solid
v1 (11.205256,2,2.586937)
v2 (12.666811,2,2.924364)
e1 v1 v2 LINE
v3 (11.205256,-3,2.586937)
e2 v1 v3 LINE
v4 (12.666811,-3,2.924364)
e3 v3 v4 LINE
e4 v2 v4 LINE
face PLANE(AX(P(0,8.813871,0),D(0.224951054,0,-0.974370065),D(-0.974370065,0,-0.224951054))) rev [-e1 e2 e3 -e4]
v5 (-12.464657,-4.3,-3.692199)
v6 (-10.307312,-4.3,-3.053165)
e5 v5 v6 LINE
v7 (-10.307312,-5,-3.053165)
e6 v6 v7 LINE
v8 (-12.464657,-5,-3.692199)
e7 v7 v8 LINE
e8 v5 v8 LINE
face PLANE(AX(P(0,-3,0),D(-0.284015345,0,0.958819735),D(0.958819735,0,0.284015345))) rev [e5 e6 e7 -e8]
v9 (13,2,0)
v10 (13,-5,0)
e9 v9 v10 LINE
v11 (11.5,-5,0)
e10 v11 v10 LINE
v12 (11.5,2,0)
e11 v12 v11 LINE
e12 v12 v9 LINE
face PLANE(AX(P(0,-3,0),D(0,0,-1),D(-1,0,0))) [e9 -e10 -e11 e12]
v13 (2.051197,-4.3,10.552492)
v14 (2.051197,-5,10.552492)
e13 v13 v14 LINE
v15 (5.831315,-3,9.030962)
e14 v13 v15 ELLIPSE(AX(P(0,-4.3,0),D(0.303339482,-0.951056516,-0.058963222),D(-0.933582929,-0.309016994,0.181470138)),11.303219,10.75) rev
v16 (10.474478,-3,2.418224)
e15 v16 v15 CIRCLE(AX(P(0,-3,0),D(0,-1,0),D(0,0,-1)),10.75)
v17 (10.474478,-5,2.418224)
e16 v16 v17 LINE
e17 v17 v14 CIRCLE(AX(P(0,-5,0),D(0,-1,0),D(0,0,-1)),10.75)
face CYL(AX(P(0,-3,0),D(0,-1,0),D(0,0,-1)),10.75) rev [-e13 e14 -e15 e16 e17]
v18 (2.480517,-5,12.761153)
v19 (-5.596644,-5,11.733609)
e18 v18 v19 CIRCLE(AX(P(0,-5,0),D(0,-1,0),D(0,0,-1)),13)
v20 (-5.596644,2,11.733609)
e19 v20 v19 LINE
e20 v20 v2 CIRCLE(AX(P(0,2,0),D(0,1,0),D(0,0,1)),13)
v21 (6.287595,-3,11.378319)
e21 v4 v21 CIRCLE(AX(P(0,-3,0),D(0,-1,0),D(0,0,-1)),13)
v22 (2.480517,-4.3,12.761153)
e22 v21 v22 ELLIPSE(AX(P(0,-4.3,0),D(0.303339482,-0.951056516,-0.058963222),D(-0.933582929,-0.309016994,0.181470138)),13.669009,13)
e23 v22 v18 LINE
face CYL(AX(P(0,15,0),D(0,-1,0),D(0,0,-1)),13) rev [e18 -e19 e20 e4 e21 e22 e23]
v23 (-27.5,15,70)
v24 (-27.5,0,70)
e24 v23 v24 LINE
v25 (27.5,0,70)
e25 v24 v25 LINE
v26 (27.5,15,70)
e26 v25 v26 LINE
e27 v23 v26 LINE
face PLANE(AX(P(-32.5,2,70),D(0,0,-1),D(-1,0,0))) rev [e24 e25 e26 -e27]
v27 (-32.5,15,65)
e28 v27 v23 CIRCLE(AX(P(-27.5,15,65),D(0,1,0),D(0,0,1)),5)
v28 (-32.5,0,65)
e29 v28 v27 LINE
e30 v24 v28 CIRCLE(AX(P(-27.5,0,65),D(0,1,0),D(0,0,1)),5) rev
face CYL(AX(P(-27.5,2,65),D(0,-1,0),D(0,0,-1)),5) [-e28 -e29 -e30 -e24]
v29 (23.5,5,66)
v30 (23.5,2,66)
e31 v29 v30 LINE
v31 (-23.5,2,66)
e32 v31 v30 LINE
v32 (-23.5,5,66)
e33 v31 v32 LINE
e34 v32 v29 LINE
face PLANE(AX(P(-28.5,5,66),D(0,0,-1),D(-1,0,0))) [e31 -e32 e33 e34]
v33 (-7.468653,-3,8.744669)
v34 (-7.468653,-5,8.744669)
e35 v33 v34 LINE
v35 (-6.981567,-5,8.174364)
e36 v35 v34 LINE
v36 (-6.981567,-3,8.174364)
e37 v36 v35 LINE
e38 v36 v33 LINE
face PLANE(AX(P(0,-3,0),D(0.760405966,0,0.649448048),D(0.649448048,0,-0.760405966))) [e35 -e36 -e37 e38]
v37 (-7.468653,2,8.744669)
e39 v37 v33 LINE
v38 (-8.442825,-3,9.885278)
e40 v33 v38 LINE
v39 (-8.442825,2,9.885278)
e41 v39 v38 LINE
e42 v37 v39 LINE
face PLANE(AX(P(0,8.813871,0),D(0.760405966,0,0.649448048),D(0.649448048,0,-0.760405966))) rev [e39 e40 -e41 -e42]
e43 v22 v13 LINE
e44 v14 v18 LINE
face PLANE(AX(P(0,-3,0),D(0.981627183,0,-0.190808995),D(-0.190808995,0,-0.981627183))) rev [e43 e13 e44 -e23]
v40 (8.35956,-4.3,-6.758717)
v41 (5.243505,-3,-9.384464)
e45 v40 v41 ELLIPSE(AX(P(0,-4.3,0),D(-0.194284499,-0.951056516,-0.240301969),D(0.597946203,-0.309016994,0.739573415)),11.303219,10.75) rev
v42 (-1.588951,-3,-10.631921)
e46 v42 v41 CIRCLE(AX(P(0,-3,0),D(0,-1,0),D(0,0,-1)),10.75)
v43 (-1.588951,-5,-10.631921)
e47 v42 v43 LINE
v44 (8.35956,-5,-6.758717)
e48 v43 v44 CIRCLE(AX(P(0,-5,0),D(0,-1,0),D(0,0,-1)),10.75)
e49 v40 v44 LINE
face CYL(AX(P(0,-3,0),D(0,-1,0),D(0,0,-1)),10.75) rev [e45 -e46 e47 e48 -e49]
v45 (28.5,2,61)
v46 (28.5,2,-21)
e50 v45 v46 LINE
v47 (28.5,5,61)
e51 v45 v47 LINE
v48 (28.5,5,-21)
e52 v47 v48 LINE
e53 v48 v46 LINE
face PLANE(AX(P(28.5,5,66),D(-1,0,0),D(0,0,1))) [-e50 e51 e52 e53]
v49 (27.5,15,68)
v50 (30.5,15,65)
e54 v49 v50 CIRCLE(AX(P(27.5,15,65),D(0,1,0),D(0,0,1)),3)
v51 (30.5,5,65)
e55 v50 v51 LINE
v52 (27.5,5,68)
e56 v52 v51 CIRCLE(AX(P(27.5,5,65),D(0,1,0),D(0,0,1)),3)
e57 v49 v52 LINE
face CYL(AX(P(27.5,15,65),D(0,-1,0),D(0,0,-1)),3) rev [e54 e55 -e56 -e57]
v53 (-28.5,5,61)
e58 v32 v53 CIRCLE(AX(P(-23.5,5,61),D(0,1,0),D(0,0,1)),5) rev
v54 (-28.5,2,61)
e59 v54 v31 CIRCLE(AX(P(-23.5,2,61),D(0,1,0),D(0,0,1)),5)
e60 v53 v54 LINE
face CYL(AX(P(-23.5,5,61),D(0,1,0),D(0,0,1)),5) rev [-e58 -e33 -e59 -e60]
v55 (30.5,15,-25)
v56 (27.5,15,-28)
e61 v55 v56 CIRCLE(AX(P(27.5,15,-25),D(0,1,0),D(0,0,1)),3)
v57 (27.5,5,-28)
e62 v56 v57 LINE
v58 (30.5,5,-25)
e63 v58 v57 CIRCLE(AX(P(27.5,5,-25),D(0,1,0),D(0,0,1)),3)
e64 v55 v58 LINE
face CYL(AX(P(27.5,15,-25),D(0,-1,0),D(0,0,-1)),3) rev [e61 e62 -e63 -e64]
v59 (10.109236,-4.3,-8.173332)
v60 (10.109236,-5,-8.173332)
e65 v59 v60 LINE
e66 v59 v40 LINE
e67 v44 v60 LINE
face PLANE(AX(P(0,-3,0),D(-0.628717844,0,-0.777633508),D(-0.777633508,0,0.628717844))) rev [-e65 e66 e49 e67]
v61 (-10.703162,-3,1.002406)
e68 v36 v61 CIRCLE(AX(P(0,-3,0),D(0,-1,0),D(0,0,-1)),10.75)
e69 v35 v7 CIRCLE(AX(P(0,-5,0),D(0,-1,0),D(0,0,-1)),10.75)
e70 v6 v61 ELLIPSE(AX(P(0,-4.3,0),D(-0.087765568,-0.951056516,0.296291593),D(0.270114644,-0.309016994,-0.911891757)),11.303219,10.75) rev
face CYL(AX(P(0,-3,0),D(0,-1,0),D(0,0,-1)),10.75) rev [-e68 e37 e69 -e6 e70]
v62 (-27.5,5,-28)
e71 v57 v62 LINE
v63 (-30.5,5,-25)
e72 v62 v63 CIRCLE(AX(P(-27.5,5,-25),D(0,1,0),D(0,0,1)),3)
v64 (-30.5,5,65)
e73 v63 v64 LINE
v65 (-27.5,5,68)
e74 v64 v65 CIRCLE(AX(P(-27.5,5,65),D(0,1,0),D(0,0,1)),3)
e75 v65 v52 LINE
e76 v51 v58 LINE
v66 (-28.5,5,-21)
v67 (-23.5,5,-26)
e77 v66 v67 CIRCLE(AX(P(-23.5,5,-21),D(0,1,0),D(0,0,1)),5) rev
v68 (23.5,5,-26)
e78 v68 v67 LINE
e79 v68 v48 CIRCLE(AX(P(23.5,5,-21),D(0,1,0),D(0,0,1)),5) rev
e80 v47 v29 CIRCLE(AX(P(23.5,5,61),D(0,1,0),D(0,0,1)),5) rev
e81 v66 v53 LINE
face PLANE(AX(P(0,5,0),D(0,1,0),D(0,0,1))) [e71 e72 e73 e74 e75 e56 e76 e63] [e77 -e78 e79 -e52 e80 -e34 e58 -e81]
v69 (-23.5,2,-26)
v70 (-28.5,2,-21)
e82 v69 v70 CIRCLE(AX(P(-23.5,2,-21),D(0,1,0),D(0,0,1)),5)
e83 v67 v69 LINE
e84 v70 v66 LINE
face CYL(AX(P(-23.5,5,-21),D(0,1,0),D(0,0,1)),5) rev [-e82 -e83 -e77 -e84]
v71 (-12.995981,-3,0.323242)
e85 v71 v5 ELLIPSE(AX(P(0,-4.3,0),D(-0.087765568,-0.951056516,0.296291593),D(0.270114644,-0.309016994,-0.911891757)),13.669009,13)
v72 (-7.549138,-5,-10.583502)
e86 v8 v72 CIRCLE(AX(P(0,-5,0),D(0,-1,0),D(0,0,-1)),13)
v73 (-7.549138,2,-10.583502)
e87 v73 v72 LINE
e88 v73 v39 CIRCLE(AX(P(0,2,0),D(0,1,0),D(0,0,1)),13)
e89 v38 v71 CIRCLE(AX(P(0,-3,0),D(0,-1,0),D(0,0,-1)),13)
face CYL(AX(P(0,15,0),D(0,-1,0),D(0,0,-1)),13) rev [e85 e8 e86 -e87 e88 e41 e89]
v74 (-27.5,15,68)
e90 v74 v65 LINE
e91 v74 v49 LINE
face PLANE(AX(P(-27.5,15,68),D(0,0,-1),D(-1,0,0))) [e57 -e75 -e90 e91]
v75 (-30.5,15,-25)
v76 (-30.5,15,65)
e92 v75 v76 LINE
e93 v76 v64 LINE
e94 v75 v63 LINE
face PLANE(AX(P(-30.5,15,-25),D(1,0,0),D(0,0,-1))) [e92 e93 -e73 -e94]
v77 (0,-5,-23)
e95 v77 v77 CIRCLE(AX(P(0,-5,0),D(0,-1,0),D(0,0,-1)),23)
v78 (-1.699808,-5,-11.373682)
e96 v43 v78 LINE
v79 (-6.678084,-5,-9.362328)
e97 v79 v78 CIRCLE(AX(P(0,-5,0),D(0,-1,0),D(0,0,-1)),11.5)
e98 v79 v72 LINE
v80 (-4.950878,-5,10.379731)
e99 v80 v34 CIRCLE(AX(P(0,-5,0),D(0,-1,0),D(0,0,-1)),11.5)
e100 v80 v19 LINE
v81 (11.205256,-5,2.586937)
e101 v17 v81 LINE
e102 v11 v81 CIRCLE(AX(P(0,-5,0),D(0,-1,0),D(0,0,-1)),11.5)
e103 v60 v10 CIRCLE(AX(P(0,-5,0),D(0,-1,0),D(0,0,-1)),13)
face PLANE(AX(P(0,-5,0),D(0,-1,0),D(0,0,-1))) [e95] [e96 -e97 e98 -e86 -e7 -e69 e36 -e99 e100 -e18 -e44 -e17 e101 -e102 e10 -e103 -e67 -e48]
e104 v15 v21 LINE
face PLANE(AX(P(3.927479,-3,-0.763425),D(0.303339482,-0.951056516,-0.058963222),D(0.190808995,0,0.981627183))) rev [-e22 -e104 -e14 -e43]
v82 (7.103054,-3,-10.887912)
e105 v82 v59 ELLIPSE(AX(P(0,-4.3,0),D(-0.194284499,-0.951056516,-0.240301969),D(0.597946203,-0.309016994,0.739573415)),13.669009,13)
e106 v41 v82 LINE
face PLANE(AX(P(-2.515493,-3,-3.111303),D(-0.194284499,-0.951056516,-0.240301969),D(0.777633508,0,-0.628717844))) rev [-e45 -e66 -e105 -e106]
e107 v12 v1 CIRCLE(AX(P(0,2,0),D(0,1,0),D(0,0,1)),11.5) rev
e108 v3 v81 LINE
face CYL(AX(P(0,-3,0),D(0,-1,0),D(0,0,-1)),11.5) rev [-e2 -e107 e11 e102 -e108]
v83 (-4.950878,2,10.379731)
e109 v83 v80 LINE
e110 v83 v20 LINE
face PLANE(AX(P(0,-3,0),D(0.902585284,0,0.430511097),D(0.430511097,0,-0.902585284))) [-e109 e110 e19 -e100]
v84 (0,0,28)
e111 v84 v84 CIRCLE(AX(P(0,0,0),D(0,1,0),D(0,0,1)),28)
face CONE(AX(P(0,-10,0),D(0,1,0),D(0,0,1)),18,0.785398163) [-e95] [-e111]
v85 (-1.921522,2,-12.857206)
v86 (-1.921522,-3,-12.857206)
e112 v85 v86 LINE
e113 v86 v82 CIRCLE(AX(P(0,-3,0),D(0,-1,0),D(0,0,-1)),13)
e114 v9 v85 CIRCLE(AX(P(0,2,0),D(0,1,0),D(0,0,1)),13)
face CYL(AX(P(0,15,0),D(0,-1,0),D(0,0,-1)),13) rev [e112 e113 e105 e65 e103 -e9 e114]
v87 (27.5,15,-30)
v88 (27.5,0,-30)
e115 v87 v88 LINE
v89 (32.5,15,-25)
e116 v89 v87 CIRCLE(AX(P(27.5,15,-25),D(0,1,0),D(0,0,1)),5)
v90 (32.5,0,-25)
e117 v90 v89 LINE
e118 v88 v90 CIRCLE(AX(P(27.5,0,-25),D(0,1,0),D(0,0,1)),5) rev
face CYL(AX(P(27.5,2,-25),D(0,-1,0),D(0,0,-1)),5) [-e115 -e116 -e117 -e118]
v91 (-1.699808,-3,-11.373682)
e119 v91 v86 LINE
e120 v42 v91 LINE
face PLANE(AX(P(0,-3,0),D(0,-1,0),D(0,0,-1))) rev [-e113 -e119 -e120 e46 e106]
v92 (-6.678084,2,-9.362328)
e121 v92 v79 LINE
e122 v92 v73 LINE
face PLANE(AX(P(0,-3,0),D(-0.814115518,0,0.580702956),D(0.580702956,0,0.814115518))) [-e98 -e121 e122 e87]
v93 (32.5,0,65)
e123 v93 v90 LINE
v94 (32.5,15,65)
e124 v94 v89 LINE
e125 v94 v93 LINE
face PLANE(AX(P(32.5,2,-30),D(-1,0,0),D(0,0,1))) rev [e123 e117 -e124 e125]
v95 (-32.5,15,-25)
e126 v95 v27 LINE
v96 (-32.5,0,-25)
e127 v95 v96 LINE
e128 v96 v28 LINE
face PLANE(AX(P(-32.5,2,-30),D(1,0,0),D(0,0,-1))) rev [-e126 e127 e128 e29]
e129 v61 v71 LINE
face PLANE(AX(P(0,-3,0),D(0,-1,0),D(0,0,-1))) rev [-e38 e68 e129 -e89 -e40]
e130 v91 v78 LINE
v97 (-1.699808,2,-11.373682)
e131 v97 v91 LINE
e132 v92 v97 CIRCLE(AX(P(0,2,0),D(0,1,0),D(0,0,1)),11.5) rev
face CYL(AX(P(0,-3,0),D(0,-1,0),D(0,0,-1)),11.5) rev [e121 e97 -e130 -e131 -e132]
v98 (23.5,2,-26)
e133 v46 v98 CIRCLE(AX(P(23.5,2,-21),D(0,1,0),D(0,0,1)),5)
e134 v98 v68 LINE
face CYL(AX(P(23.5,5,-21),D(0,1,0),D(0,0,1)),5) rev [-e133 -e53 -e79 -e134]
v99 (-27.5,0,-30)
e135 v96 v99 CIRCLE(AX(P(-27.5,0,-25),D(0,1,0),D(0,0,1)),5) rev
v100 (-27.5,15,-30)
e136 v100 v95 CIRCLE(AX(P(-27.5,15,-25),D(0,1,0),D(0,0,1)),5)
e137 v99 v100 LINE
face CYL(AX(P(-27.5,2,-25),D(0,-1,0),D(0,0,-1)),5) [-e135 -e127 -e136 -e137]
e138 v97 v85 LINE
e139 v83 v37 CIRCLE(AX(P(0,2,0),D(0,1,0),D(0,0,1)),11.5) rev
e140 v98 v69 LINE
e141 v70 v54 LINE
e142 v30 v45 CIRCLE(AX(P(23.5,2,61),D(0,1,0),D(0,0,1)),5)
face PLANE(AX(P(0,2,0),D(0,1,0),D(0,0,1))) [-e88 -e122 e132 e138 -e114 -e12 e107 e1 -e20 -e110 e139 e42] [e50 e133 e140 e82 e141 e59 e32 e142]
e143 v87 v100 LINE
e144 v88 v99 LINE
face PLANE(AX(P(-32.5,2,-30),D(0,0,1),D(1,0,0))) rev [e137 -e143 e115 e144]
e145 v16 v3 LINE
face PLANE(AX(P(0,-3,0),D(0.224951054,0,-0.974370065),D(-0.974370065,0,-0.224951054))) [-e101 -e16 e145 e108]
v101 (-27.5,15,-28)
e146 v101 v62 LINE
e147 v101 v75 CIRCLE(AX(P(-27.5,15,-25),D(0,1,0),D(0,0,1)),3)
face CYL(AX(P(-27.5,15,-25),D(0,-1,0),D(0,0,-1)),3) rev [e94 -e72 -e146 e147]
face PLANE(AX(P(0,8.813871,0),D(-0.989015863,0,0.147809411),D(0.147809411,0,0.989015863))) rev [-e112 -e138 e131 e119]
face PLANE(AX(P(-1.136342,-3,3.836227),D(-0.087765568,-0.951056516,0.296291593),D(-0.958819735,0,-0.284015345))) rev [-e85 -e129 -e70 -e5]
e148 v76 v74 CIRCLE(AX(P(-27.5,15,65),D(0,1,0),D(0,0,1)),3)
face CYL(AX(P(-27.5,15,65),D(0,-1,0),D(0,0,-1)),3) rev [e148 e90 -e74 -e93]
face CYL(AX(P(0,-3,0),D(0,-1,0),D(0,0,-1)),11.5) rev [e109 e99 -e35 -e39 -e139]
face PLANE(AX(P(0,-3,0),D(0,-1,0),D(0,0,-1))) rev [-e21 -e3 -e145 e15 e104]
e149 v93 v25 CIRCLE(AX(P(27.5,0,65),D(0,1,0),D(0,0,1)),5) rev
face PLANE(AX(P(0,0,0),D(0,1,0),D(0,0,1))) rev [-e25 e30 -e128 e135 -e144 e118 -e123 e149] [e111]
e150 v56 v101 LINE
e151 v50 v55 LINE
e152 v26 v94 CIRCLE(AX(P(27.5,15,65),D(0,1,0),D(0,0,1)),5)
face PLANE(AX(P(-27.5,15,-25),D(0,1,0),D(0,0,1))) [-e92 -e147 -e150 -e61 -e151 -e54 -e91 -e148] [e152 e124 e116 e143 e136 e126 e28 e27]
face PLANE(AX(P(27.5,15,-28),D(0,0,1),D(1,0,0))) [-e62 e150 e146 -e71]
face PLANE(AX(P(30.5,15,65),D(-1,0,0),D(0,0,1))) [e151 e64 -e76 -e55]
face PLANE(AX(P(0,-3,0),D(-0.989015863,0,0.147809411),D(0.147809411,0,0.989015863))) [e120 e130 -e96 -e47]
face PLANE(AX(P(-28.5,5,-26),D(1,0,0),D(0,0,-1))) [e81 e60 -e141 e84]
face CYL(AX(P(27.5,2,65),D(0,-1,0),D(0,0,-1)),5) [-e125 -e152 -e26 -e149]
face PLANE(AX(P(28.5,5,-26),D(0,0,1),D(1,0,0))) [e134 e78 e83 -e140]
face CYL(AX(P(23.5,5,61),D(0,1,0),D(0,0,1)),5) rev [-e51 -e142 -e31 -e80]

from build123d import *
from OCP.BRepFilletAPI import BRepFilletAPI_MakeChamfer

# Parameters (mm, degrees)
SKETCH1_W           = 65
SKETCH1_H           = 100
BOSS_EXTRUDE1_DEPTH = 2
SKETCH2_W           = 65
SKETCH2_H           = 100
SKETCH2_W_2         = 57
SKETCH2_H_2         = 92
BOSS_EXTRUDE2_DEPTH = 3
FILLET1_R           = 5
BOSS_EXTRUDE3_DEPTH = 10
SKETCH6_R           = 18
BOSS_EXTRUDE4_DEPTH = 5
CHAMFER1_SIZE       = 10
SKETCH7_R           = 13
CUT_EXTRUDE1_DEPTH  = 80.726093596
BOSS_EXTRUDE6_DEPTH = 2
BOSS_EXTRUDE7_DEPTH = 7
CHAMFER2_SIZE       = 1.3
CHAMFER2_SIZE2      = 4.000988598


with BuildPart() as part:
    # Sketch1 → Boss-Extrude1 (new body)
    with BuildSketch(Plane(origin=(0, 0, 0), x_dir=(1, 0, 0), z_dir=(0, 1, 0))):
        with Locations((0, -20)):
            Rectangle(SKETCH1_W, SKETCH1_H)
    extrude(amount=BOSS_EXTRUDE1_DEPTH)

    # Sketch2 → Boss-Extrude2 (add)
    with BuildSketch(Plane(origin=(0, 2, 0), x_dir=(1, 0, 0), z_dir=(0, 1, 0))):
        with Locations((0, -20)):
            Rectangle(SKETCH2_W, SKETCH2_H)
        with Locations((0, -20)):
            Rectangle(SKETCH2_W_2, SKETCH2_H_2, mode=Mode.SUBTRACT)
    extrude(amount=BOSS_EXTRUDE2_DEPTH)

    # Fillet1
    fillet1_edges = [part.edges().sort_by_distance(p)[0] for p in [
        (-28.5, 3.5, 66),
        (28.5, 3.5, 66),
        (28.5, 3.5, -26),
        (-28.5, 3.5, -26),
        (-32.5, 2.5, -30),
        (32.5, 2.5, -30),
        (32.5, 2.5, 70),
        (-32.5, 2.5, 70),
    ]]
    fillet(fillet1_edges, radius=FILLET1_R)

    # Sketch4 → Boss-Extrude3 (add)
    with BuildSketch(Plane(origin=(0, 5, 0), x_dir=(1, 0, 0), z_dir=(0, 1, 0))):
        with BuildLine():
            Line((-32.5, 25), (-32.5, -65))
            ThreePointArc((-32.5, -65), (-31.035533906, -68.535533906), (-27.5, -70))
            Line((-27.5, -70), (27.5, -70))
            ThreePointArc((27.5, -70), (31.035533906, -68.535533906), (32.5, -65))
            Line((32.5, -65), (32.5, 25))
            ThreePointArc((32.5, 25), (31.035533906, 28.535533906), (27.5, 30))
            Line((27.5, 30), (-27.5, 30))
            ThreePointArc((-27.5, 30), (-31.035533906, 28.535533906), (-32.5, 25))
        make_face()
        with BuildLine():
            Line((-30.5, 25), (-30.5, -65))
            ThreePointArc((-30.5, -65), (-29.621320344, -67.121320344), (-27.5, -68))
            Line((-27.5, -68), (27.5, -68))
            ThreePointArc((27.5, -68), (29.621320344, -67.121320344), (30.5, -65))
            Line((30.5, -65), (30.5, 25))
            ThreePointArc((30.5, 25), (29.621320344, 27.121320344), (27.5, 28))
            Line((27.5, 28), (-27.5, 28))
            ThreePointArc((-27.5, 28), (-29.621320344, 27.121320344), (-30.5, 25))
        make_face(mode=Mode.SUBTRACT)
    extrude(amount=BOSS_EXTRUDE3_DEPTH)

    # Sketch6 → Boss-Extrude4 (add)
    with BuildSketch(Plane(origin=(0, -5, 0), x_dir=(-1, 0, 0), z_dir=(0, -1, 0))):
        with Locations(Location((0, 0, 0), (0, 0, 90))):
            Circle(SKETCH6_R)
    extrude(amount=-BOSS_EXTRUDE4_DEPTH)

    # Chamfer1
    # the kernel refuses this chamfer: 10 mm, written as the material it adds along each edge
    with BuildSketch(Plane(origin=(0, 0, 0), x_dir=(0, 0, -1), z_dir=(-1, 0, 0))) as chamfer1_piece_1_section:
        Polygon((18 + CHAMFER1_SIZE, 0), (18, CHAMFER1_SIZE), (18, 0), align=None)
    chamfer1_piece_1 = revolve(axis=Axis((0, 0, 0), (0, -1, 0)), mode=Mode.PRIVATE)
    chamfer1_piece_1 = split(chamfer1_piece_1, bisect_by=Plane(origin=(0, -5, 25.515578953), z_dir=(0, 1, 0)), keep=Keep.TOP, mode=Mode.PRIVATE)
    add(chamfer1_piece_1)

    # Sketch7 → Cut-Extrude1 (cut, through all)
    with BuildSketch(Plane.XZ.offset(5)):
        with Locations(Location((0, 0, 0), (0, 0, 270))):
            Circle(SKETCH7_R)
    extrude(amount=-CUT_EXTRUDE1_DEPTH, mode=Mode.SUBTRACT)

    # Sketch8 → Boss-Extrude6 (add)
    with BuildSketch(Plane(origin=(0, -5, 0), x_dir=(-1, 0, 0), z_dir=(0, -1, 0))):
        with BuildLine():
            ThreePointArc((-8.942785339, 7.230255208), (-4.172190868, 10.71647439), (1.699808228, 11.373682429))
            Line((1.699808228, 11.373682429), (1.921522345, 12.857206224))
            ThreePointArc((1.921522345, 12.857206224), (-4.716389677, 12.114275398), (-10.109235601, 8.173331975))
            Line((-10.109235601, 8.173331975), (-8.942785339, 7.230255208))
        make_face()
        with BuildLine():
            Line((1.921522345, 12.857206224), (1.699808228, 11.373682429))
            ThreePointArc((1.699808228, 11.373682429), (4.307975824, 10.662614328), (6.678083991, 9.362328461))
            Line((6.678083991, 9.362328461), (7.549138424, 10.583501739))
            ThreePointArc((7.549138424, 10.583501739), (4.869885714, 12.053390109), (1.921522345, 12.857206224))
        make_face()
        with BuildLine():
            Line((12.464656553, 3.692199481), (11.026426951, 3.266176464))
            ThreePointArc((11.026426951, 3.266176464), (11.380990948, 1.650165153), (11.5, 0))
            ThreePointArc((11.5, 0), (10.443646499, -4.814586982), (7.468652556, -8.744668604))
            Line((7.468652556, -8.744668604), (8.442824628, -9.885277553))
            ThreePointArc((8.442824628, -9.885277553), (11.80586126, -5.442576588), (13, 0))
            ThreePointArc((13, 0), (12.865468029, 1.865404086), (12.464656553, 3.692199481))
        make_face()
        with BuildLine():
            ThreePointArc((7.468652556, -8.744668604), (6.263348903, -9.644711531), (4.950877613, -10.37973077))
            Line((4.950877613, -10.37973077), (5.596644259, -11.733608697))
            ThreePointArc((5.596644259, -11.733608697), (7.080307455, -10.902717383), (8.442824628, -9.885277553))
            Line((8.442824628, -9.885277553), (7.468652556, -8.744668604))
        make_face()
        with BuildLine():
            ThreePointArc((-8.359560208, 6.758716825), (-3.900091464, 10.017573887), (1.58895117, 10.631920531))
            Line((1.58895117, 10.631920531), (1.699808228, 11.373682429))
            ThreePointArc((1.699808228, 11.373682429), (-4.172190868, 10.71647439), (-8.942785339, 7.230255208))
            Line((-8.942785339, 7.230255208), (-8.359560208, 6.758716825))
        make_face()
        with BuildLine():
            Line((11.026426951, 3.266176464), (10.30731215, 3.053164956))
            ThreePointArc((10.30731215, 3.053164956), (10.638752408, 1.542545686), (10.75, 0))
            ThreePointArc((10.75, 0), (9.762539119, -4.500592179), (6.98156652, -8.17436413))
            Line((6.98156652, -8.17436413), (7.468652556, -8.744668604))
            ThreePointArc((7.468652556, -8.744668604), (10.443646499, -4.814586982), (11.5, 0))
            ThreePointArc((11.5, 0), (11.380990948, 1.650165153), (11.026426951, 3.266176464))
        make_face()
        with BuildLine():
            Line((-2.48051694, -12.761153385), (-2.194303447, -11.28871261))
            ThreePointArc((-2.194303447, -11.28871261), (-7.98857126, -8.272407704), (-11.205255745, -2.586937125))
            Line((-11.205255745, -2.586937125), (-12.666810842, -2.924363706))
            ThreePointArc((-12.666810842, -2.924363706), (-9.030558816, -9.351417404), (-2.48051694, -12.761153385))
        make_face()
        with BuildLine():
            Line((-2.194303447, -11.28871261), (-2.0511967, -10.552492222))
            ThreePointArc((-2.0511967, -10.552492222), (-7.467577482, -7.732902854), (-10.474478196, -2.418223834))
            Line((-10.474478196, -2.418223834), (-11.205255745, -2.586937125))
            ThreePointArc((-11.205255745, -2.586937125), (-7.98857126, -8.272407704), (-2.194303447, -11.28871261))
        make_face()
        with BuildLine():
            ThreePointArc((-11.205255745, -2.586937125), (-11.42607634, -1.301836958), (-11.5, 0))
            Line((-11.5, 0), (-13, 0))
            ThreePointArc((-13, 0), (-12.916434124, -1.471641779), (-12.666810842, -2.924363706))
            Line((-12.666810842, -2.924363706), (-11.205255745, -2.586937125))
        make_face()
    extrude(amount=-BOSS_EXTRUDE6_DEPTH)

    # Sketch8<5> → Boss-Extrude7 (add)
    with BuildSketch(Plane(origin=(0, -5, 0), x_dir=(-1, 0, 0), z_dir=(0, -1, 0))):
        with BuildLine():
            Line((1.921522345, 12.857206224), (1.699808228, 11.373682429))
            ThreePointArc((1.699808228, 11.373682429), (4.307975824, 10.662614328), (6.678083991, 9.362328461))
            Line((6.678083991, 9.362328461), (7.549138424, 10.583501739))
            ThreePointArc((7.549138424, 10.583501739), (4.869885714, 12.053390109), (1.921522345, 12.857206224))
        make_face()
        with BuildLine():
            ThreePointArc((7.468652556, -8.744668604), (6.263348903, -9.644711531), (4.950877613, -10.37973077))
            Line((4.950877613, -10.37973077), (5.596644259, -11.733608697))
            ThreePointArc((5.596644259, -11.733608697), (7.080307455, -10.902717383), (8.442824628, -9.885277553))
            Line((8.442824628, -9.885277553), (7.468652556, -8.744668604))
        make_face()
        with BuildLine():
            ThreePointArc((-11.205255745, -2.586937125), (-11.42607634, -1.301836958), (-11.5, 0))
            Line((-11.5, 0), (-13, 0))
            ThreePointArc((-13, 0), (-12.916434124, -1.471641779), (-12.666810842, -2.924363706))
            Line((-12.666810842, -2.924363706), (-11.205255745, -2.586937125))
        make_face()
    extrude(amount=-BOSS_EXTRUDE7_DEPTH)

    # Chamfer2: one chamfer whose edges measure the first distance from different faces: ONE call of the kernel's chamfer builder (chamfer() names one face for all edges)
    chamfer2_edges_1 = [part.edges().sort_by_distance(p)[0] for p in [
        (9.234397905, -3, -7.4660244),
    ]]
    chamfer2_side_1 = [part.faces().sort_by_distance(p)[0] for p in [
        (9.234397905, -4, -7.4660244),
    ]]
    chamfer2_edges_2 = [part.edges().sort_by_distance(p)[0] for p in [
        (-11.385984352, -3, -3.372682218),
    ]]
    chamfer2_side_2 = [part.faces().sort_by_distance(p)[0] for p in [
        (-11.385984352, -4, -3.372682218),
    ]]
    chamfer2_edges_3 = [part.edges().sort_by_distance(p)[0] for p in [
        (2.26585682, -3, 11.656822803),
    ]]
    chamfer2_side_3 = [part.faces().sort_by_distance(p)[0] for p in [
        (2.26585682, -4, 11.656822803),
    ]]
    chamfer2 = BRepFilletAPI_MakeChamfer(part.part.solid().wrapped)
    for e in chamfer2_edges_1:
        chamfer2.Add(CHAMFER2_SIZE, CHAMFER2_SIZE2, e.wrapped, chamfer2_side_1[0].wrapped)  # the first distance lies on this face
    for e in chamfer2_edges_2:
        chamfer2.Add(CHAMFER2_SIZE, CHAMFER2_SIZE2, e.wrapped, chamfer2_side_2[0].wrapped)  # the first distance lies on this face
    for e in chamfer2_edges_3:
        chamfer2.Add(CHAMFER2_SIZE, CHAMFER2_SIZE2, e.wrapped, chamfer2_side_3[0].wrapped)  # the first distance lies on this face
    add(Compound.cast(chamfer2.Shape()), mode=Mode.REPLACE)


solid = part.part
